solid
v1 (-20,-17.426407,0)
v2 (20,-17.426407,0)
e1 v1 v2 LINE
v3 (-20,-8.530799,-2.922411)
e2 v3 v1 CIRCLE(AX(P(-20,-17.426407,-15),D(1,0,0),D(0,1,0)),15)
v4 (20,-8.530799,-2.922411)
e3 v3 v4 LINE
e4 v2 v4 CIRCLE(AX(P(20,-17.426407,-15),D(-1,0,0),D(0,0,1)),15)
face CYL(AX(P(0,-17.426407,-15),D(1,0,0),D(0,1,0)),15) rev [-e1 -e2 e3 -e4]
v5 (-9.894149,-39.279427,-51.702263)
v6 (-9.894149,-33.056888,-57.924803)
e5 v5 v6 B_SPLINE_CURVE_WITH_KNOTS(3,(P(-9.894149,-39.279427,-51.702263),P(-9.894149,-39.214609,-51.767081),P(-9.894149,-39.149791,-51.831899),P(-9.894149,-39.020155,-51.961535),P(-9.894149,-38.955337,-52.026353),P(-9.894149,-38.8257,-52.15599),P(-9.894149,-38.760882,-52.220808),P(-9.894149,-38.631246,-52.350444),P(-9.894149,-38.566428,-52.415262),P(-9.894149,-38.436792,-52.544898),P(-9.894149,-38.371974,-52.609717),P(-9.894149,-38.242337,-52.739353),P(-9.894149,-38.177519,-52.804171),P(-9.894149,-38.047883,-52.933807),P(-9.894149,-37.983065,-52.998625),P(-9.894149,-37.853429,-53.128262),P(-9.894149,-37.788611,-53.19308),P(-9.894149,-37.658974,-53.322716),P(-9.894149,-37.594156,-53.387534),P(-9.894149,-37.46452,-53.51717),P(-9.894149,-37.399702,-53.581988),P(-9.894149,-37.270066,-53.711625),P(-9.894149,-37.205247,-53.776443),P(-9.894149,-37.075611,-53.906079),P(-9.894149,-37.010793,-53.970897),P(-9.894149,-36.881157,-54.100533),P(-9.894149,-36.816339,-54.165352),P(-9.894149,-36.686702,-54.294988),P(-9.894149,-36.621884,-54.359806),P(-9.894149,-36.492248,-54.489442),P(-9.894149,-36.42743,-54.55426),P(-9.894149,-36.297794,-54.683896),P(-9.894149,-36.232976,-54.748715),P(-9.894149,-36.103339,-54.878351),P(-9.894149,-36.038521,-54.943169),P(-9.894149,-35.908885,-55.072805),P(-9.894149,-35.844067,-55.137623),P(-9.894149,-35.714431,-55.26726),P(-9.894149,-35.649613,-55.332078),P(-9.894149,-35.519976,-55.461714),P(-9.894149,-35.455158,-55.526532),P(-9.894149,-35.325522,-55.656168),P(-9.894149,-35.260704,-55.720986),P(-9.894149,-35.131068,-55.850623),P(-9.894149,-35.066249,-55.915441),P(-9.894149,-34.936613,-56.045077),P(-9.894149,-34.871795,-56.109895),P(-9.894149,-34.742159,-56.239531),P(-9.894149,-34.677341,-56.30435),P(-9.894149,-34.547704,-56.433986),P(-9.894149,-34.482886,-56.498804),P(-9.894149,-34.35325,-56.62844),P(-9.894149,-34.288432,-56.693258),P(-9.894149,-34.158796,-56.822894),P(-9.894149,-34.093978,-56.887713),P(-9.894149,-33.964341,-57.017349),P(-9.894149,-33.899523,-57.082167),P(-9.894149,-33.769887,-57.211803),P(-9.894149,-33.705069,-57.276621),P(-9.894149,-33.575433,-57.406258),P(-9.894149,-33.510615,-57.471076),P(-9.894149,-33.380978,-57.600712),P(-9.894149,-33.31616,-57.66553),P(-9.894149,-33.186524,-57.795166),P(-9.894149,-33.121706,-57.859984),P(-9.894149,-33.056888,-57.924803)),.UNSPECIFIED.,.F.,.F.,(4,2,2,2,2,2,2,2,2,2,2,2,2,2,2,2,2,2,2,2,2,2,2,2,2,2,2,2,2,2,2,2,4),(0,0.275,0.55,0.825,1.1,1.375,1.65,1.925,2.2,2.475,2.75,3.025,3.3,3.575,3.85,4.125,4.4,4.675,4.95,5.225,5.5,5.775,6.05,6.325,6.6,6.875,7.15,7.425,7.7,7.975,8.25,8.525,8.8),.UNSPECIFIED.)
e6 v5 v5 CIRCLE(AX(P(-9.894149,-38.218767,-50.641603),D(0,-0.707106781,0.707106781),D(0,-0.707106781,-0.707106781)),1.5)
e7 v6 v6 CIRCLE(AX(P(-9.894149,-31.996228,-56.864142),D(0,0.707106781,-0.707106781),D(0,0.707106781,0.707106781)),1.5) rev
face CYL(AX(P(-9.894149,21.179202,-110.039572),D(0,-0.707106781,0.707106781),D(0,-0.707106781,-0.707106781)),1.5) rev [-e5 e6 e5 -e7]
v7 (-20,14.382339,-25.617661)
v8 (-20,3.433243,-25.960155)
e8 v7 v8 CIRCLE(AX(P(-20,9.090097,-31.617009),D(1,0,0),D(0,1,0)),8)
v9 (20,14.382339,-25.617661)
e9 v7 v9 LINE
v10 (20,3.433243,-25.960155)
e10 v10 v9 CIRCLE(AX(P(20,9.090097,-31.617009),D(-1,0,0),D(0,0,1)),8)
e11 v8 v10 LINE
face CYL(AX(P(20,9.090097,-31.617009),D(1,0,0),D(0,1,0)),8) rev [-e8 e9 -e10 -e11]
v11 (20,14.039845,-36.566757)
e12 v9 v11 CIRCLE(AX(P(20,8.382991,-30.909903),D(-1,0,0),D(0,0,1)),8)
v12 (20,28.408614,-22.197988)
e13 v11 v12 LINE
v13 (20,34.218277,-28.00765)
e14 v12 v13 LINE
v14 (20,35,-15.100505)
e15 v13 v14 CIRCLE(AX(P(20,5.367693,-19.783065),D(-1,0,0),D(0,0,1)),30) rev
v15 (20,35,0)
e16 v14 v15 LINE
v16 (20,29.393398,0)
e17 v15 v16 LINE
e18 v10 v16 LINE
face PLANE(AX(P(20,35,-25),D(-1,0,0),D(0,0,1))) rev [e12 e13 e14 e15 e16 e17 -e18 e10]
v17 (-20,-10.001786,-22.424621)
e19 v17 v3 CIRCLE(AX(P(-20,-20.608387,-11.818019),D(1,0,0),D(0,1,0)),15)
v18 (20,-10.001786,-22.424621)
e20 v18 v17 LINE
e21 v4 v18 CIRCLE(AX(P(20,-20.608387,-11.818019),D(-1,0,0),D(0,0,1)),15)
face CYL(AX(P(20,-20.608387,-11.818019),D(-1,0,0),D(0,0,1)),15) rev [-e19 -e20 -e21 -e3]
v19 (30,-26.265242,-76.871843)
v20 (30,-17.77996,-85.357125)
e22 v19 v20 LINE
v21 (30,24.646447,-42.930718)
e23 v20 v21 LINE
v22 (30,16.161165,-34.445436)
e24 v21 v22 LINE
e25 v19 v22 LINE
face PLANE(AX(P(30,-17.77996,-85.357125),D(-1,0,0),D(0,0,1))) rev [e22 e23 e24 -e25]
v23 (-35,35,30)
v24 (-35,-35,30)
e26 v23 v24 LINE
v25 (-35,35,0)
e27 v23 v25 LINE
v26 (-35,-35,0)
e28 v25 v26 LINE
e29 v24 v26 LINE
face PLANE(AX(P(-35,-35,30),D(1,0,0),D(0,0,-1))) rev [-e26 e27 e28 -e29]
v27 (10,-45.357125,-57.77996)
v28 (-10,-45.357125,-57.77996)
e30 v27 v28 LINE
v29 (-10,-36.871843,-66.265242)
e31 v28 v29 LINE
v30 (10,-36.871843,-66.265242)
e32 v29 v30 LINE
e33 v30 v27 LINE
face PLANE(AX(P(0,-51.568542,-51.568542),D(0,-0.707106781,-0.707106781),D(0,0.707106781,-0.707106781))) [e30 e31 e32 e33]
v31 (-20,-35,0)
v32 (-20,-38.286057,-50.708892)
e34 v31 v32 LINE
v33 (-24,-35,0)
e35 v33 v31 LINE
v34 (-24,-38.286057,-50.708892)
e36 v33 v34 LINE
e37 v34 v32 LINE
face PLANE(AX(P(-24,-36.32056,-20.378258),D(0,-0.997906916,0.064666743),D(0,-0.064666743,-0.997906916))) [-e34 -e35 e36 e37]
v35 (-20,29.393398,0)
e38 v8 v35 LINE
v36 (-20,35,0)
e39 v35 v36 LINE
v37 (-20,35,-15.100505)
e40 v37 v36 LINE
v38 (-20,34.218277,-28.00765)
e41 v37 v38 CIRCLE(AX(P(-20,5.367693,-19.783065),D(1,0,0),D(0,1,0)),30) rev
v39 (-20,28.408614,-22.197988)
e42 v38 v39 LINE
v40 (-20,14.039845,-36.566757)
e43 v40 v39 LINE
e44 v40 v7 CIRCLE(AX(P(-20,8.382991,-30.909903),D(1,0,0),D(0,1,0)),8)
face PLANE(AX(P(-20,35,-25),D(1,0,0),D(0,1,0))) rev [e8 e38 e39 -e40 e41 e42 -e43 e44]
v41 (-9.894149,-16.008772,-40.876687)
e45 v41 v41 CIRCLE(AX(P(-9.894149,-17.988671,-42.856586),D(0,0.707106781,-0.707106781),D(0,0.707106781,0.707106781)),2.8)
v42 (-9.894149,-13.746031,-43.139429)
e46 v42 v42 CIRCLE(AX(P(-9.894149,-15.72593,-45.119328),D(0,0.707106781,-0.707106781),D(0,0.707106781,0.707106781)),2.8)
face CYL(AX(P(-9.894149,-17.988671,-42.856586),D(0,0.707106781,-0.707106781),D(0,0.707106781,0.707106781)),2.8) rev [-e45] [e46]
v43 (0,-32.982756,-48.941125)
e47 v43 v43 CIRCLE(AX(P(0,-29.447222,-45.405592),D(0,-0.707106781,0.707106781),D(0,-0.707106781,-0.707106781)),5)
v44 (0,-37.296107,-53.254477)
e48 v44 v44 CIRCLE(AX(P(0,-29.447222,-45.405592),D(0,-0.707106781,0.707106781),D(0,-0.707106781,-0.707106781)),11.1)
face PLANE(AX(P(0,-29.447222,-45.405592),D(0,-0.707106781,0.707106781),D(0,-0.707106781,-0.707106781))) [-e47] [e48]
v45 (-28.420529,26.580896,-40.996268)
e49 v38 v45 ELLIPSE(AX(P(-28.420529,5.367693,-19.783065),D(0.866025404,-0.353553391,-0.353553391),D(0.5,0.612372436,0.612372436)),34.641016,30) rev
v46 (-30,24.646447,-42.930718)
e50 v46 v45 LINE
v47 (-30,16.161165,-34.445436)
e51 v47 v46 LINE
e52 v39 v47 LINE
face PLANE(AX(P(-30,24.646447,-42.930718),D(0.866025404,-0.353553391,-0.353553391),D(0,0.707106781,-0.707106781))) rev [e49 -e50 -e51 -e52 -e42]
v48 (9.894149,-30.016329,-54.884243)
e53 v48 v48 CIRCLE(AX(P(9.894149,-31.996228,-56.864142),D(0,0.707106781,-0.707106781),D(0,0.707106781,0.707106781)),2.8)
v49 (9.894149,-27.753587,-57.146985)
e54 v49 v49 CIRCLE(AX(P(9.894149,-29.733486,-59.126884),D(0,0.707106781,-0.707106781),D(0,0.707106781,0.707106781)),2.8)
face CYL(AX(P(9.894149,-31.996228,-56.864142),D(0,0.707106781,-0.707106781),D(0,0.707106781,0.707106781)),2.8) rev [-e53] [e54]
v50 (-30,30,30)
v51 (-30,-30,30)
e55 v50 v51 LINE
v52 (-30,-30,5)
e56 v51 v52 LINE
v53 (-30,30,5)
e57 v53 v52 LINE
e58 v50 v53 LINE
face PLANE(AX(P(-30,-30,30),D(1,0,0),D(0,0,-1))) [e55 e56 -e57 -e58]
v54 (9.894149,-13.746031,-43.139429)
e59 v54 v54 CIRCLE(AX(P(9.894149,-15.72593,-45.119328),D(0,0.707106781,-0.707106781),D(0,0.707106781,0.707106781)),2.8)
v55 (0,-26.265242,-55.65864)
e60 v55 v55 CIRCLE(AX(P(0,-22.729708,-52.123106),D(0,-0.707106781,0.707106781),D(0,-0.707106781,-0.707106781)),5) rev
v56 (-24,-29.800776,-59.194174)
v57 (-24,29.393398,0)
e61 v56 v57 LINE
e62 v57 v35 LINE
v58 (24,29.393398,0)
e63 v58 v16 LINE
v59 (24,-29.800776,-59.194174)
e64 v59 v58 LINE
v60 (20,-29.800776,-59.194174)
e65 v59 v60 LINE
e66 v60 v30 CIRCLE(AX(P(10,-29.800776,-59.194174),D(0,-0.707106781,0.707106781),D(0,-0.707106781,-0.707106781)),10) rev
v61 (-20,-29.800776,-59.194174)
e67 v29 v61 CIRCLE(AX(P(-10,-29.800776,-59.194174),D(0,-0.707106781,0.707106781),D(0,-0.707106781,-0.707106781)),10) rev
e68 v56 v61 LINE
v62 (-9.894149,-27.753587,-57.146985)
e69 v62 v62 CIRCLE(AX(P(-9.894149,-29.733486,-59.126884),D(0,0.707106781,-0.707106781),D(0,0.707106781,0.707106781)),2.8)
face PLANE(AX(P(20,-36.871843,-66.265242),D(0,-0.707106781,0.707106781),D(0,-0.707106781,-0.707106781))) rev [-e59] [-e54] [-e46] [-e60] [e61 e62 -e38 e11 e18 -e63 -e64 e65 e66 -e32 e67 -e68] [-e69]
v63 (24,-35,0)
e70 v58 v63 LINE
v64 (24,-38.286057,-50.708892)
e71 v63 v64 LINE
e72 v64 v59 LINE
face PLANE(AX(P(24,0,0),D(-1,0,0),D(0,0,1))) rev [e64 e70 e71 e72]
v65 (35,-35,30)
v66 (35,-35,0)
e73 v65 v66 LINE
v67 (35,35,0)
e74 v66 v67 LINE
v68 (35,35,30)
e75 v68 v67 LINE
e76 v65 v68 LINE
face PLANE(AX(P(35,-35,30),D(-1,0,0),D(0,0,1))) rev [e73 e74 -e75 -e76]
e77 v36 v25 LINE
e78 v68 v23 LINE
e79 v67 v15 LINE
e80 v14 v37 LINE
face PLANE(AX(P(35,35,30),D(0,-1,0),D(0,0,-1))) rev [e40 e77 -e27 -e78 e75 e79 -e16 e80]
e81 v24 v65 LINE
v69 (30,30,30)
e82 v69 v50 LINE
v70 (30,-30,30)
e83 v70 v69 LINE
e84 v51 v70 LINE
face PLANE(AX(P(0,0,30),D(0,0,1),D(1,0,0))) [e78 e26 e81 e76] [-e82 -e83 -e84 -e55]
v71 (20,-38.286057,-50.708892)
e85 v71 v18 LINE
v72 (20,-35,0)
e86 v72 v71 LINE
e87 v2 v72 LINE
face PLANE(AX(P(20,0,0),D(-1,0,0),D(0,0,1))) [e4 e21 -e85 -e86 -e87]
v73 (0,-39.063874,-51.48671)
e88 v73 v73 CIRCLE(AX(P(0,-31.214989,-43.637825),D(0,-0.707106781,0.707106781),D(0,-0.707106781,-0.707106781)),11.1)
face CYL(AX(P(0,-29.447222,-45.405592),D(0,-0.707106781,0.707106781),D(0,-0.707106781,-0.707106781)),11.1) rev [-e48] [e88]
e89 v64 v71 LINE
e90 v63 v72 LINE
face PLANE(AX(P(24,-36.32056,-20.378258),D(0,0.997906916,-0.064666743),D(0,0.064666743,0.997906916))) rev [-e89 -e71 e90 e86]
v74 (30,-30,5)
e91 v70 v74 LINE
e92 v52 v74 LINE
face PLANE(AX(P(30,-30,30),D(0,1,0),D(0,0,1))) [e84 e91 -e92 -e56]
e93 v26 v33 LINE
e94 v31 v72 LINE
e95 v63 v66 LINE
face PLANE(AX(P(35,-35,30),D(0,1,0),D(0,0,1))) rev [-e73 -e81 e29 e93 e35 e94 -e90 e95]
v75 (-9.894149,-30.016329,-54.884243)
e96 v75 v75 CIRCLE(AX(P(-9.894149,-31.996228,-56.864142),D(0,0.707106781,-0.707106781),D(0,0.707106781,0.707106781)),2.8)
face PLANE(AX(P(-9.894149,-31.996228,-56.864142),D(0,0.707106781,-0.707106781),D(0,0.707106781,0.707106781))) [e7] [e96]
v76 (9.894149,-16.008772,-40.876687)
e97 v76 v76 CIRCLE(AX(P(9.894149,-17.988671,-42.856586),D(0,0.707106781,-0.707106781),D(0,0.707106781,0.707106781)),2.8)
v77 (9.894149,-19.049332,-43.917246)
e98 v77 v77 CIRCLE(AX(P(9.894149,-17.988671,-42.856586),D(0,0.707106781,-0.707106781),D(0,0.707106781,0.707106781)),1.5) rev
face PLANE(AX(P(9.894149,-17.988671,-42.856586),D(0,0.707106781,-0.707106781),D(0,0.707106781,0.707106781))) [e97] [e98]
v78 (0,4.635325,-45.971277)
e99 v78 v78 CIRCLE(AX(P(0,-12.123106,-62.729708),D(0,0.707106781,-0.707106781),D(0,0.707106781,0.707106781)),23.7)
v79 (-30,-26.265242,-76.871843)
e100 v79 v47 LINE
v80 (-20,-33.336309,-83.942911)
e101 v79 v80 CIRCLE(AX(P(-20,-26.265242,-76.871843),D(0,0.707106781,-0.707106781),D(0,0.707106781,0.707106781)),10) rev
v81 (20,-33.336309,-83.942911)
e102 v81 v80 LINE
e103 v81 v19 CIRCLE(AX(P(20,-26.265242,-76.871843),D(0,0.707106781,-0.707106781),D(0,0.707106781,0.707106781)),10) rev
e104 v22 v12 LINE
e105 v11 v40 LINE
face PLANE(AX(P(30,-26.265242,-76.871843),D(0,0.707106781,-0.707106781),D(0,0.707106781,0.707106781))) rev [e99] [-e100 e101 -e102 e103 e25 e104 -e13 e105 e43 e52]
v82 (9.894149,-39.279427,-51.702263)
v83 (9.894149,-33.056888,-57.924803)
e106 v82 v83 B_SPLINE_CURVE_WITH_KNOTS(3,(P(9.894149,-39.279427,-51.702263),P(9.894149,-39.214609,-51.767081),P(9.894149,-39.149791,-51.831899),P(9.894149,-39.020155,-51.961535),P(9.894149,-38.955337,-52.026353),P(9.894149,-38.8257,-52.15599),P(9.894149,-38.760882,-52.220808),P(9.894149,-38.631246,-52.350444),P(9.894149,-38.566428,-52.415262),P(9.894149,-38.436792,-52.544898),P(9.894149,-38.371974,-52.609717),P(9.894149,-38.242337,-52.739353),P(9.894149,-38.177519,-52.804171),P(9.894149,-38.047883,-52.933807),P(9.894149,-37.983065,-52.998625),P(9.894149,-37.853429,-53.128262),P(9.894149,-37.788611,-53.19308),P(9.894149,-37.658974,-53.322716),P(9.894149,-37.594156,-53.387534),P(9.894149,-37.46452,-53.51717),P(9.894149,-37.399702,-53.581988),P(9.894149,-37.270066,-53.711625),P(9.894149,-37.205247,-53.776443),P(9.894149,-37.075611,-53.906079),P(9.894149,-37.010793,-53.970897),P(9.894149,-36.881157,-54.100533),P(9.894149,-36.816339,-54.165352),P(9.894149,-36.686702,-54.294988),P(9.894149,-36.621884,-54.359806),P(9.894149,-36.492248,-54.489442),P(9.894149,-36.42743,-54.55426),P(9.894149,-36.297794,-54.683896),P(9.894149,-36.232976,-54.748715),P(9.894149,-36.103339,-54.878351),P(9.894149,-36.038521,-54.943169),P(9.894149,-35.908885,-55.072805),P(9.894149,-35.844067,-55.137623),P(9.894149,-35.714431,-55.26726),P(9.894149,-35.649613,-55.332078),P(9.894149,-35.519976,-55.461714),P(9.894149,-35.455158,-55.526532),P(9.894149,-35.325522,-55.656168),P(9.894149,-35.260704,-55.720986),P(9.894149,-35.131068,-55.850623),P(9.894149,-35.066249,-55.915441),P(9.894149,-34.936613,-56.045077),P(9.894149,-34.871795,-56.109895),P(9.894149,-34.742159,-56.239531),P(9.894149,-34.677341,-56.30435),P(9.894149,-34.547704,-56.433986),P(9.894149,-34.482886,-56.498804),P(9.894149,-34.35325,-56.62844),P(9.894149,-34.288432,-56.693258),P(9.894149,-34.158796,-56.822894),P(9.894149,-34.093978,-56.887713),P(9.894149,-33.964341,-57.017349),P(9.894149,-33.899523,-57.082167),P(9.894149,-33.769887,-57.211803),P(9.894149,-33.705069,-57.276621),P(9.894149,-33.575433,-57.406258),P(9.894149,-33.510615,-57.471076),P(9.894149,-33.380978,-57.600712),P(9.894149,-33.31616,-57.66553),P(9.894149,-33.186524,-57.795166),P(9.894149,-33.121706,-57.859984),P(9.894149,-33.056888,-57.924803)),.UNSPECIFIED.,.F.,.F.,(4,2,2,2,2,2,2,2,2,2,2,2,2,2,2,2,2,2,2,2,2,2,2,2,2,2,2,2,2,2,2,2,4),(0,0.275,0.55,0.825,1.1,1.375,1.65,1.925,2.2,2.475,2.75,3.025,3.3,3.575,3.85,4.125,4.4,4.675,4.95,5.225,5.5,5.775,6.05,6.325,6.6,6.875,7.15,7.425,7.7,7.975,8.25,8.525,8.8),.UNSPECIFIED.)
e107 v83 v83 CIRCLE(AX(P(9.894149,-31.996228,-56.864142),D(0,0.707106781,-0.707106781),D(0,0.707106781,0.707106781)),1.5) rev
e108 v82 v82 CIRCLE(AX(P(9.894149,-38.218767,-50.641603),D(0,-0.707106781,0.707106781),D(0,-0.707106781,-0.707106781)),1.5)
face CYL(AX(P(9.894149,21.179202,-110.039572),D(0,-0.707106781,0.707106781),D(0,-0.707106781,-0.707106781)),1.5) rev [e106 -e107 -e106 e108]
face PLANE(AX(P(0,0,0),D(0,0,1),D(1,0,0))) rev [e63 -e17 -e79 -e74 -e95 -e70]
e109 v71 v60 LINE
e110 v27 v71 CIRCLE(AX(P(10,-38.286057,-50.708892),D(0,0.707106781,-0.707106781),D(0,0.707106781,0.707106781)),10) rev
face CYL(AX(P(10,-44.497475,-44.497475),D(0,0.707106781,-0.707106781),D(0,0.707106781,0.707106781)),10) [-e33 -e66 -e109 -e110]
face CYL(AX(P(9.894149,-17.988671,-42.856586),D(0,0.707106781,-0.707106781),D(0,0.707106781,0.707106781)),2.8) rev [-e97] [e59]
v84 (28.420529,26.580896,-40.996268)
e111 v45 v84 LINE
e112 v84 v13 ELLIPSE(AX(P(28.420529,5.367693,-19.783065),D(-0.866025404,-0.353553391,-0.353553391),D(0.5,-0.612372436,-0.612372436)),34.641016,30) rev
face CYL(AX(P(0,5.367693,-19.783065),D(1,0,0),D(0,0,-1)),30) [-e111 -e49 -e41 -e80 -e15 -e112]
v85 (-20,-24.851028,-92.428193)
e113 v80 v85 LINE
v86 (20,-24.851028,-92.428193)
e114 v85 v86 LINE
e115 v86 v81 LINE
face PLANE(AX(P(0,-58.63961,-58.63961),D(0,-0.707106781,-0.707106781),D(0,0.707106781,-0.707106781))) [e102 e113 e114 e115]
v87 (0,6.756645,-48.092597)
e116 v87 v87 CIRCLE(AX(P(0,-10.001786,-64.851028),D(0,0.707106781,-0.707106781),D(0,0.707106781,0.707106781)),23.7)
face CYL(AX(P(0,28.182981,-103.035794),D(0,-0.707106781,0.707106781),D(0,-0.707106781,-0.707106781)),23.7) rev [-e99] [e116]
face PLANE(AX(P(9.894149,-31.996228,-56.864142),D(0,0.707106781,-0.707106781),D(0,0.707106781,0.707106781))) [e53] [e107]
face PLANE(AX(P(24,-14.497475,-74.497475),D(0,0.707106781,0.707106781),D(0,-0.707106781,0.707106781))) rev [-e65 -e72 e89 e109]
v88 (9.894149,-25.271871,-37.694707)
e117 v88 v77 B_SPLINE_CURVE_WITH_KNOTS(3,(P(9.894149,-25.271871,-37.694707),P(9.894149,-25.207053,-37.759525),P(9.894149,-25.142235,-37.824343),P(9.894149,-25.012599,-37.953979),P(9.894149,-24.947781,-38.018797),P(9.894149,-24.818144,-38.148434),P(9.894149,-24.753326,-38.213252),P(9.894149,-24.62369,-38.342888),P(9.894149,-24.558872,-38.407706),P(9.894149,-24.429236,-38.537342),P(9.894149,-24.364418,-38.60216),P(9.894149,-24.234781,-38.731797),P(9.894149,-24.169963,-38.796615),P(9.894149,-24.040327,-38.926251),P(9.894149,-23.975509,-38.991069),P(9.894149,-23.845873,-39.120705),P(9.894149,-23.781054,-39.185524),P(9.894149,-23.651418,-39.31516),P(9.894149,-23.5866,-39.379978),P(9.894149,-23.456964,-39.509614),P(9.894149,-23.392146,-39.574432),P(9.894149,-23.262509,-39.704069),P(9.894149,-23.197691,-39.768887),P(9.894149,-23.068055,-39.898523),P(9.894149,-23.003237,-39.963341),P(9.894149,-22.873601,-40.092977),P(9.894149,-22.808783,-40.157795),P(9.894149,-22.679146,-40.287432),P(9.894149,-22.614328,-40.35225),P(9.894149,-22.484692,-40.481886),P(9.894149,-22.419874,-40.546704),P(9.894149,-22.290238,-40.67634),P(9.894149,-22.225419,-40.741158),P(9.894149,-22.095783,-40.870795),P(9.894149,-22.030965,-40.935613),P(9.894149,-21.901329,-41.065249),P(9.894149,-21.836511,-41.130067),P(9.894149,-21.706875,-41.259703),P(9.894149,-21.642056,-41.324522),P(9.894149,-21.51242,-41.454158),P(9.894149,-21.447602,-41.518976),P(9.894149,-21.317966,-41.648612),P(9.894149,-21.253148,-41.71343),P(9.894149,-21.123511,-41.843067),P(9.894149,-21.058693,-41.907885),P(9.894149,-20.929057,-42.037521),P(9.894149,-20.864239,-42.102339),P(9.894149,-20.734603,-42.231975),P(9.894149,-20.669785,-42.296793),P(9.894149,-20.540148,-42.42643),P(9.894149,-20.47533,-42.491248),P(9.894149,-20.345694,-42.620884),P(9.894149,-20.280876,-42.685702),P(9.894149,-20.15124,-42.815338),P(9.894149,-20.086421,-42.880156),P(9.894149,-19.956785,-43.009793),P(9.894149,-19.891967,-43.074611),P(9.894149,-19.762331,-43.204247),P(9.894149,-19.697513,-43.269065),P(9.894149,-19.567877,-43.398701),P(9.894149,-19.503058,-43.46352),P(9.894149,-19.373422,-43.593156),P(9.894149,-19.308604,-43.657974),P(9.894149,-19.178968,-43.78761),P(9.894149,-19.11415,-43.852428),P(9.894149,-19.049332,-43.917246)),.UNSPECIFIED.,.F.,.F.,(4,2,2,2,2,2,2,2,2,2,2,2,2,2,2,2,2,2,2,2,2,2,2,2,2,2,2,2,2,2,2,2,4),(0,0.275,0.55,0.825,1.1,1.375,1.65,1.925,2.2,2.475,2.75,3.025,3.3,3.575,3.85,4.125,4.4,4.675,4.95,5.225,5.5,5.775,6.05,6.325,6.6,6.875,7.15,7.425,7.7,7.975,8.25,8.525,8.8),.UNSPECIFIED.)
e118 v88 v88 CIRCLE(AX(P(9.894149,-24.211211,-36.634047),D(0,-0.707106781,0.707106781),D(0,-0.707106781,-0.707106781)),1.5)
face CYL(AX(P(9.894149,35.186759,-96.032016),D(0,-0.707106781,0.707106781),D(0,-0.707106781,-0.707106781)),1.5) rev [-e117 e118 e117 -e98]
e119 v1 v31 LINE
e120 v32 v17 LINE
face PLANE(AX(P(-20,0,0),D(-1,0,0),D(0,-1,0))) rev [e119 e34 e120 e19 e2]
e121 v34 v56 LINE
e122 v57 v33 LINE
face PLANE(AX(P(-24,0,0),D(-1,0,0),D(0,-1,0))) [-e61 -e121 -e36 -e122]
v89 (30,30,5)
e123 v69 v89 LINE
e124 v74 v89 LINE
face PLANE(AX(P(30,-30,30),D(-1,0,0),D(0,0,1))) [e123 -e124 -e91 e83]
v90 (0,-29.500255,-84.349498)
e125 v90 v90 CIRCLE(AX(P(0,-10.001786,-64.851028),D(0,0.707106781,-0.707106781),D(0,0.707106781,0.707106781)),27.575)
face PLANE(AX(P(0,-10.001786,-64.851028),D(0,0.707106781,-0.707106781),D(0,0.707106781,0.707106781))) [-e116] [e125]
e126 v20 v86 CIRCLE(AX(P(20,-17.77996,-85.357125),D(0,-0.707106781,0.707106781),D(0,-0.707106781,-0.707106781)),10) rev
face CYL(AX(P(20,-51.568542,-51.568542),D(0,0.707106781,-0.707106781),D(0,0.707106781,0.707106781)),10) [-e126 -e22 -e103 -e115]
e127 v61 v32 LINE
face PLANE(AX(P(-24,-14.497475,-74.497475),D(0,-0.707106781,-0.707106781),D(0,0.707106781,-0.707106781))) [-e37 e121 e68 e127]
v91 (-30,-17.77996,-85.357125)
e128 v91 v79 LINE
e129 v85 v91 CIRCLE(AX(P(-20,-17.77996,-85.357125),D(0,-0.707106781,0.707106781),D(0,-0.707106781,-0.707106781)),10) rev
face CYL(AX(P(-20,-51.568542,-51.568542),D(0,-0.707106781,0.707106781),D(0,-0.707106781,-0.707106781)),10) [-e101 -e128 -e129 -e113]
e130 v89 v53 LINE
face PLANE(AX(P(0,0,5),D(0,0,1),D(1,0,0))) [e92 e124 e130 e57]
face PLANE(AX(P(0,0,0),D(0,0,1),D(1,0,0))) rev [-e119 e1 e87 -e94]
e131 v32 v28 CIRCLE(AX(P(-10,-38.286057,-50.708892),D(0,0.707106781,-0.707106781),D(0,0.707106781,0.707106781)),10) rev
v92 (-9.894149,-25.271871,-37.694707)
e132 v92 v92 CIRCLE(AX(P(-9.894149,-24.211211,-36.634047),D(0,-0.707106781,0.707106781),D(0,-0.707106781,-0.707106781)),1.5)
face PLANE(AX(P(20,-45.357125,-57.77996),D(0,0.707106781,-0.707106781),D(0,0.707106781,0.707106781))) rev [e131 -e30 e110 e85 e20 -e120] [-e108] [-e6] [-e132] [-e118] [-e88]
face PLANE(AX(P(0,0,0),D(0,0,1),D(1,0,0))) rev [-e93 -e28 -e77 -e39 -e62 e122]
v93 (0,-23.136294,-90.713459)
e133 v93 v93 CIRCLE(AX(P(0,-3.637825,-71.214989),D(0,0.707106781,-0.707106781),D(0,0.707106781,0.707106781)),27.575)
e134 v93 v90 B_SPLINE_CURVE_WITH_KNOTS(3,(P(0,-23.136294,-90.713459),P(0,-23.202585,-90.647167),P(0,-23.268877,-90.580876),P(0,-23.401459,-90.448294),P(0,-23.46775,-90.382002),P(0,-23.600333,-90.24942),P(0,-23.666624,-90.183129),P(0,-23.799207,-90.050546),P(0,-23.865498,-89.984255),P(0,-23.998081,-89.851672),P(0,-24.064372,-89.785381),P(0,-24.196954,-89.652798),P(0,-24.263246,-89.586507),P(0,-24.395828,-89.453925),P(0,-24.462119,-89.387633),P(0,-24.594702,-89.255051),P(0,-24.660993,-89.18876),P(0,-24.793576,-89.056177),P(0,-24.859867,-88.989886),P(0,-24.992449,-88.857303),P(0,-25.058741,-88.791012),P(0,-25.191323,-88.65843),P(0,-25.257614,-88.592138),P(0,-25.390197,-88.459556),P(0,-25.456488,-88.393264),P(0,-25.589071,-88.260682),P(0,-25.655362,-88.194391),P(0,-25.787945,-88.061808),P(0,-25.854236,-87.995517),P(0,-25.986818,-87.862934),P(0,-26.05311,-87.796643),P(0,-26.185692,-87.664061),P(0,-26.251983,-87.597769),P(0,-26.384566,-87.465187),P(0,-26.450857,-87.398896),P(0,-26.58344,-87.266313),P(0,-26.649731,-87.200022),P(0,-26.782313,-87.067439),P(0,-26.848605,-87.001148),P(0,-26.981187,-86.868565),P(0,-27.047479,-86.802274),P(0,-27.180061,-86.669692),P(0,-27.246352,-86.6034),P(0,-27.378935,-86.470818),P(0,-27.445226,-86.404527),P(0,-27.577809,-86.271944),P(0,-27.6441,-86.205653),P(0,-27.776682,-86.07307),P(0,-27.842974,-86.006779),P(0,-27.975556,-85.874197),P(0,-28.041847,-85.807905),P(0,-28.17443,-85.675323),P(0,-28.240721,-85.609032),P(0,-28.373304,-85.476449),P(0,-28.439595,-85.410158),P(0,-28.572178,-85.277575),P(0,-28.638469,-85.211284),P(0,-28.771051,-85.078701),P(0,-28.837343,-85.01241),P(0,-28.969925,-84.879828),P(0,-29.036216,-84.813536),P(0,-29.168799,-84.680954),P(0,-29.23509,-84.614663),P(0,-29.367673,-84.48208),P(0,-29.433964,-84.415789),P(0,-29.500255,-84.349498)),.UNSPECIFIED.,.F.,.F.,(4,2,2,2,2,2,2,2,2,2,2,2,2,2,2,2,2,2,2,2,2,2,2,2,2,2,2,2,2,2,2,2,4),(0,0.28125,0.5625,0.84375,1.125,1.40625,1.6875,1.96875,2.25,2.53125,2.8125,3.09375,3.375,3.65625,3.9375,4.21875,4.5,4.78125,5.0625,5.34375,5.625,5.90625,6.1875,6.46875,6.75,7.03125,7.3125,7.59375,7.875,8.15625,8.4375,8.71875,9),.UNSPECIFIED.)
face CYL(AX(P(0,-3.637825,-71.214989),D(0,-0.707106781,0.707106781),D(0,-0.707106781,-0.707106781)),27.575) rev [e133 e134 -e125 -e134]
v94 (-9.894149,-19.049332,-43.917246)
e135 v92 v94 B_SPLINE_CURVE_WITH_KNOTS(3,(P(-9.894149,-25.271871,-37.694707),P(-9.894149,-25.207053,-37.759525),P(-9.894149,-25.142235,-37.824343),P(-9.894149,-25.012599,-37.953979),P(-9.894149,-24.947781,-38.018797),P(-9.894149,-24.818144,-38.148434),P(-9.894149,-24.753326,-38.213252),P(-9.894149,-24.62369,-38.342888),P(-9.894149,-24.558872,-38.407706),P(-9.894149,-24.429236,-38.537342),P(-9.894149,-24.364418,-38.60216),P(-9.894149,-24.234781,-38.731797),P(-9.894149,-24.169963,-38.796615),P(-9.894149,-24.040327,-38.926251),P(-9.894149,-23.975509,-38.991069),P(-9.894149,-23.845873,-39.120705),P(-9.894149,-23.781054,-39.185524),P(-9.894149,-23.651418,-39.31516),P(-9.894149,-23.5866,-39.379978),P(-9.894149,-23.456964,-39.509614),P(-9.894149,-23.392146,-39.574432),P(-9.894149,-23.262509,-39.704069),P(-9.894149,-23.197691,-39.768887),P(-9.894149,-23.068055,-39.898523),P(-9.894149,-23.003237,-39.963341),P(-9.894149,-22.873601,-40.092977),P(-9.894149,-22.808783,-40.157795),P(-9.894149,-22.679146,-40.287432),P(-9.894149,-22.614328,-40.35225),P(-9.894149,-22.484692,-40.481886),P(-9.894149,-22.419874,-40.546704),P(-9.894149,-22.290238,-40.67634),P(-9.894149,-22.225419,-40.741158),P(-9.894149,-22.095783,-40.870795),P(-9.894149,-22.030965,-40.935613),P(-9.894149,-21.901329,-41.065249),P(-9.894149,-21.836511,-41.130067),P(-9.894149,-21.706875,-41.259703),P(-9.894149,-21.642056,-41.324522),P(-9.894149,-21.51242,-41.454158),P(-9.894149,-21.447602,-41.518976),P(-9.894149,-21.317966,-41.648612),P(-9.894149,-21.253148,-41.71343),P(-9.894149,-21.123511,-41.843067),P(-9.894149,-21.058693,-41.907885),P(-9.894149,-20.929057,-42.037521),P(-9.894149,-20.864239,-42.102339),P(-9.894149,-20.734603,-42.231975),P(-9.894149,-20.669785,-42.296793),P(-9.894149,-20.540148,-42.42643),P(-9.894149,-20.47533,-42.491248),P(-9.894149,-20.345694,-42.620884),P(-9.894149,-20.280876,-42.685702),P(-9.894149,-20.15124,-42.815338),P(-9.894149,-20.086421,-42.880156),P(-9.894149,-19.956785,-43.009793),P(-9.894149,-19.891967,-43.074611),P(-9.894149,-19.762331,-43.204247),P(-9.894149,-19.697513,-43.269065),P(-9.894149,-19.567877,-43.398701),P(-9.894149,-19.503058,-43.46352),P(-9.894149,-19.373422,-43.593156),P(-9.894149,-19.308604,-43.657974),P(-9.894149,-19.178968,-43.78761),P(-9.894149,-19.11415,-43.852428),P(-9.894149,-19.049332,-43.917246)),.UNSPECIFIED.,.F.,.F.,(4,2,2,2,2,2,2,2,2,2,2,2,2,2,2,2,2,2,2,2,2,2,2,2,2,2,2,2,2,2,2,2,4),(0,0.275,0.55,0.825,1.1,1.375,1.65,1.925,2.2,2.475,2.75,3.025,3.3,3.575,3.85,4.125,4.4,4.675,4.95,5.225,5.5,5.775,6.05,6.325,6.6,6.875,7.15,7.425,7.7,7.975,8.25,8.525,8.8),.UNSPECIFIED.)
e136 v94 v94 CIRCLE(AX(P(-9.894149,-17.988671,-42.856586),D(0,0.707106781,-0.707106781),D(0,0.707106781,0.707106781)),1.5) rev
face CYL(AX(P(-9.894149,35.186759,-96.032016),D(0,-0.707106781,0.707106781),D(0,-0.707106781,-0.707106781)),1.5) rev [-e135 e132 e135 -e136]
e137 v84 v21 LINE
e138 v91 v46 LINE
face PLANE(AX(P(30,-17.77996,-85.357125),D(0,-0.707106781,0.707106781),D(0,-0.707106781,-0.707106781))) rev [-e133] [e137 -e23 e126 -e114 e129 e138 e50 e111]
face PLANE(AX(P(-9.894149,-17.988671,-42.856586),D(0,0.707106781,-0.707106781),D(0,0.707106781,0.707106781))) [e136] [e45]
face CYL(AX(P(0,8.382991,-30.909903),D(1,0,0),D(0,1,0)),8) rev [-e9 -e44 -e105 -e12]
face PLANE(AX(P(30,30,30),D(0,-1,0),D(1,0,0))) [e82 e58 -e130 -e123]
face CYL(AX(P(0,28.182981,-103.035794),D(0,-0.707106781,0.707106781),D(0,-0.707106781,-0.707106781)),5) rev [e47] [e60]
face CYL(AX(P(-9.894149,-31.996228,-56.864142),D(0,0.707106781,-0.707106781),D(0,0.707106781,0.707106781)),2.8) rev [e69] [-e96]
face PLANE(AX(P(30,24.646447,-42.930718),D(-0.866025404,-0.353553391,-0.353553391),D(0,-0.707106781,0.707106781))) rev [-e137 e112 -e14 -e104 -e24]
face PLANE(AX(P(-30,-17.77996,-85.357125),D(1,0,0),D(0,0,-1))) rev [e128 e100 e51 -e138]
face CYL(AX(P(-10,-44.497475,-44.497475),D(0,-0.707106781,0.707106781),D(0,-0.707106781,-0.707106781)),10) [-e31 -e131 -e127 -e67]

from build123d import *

# Parameters (mm, degrees)
SCHIZZO1_W                   = 70
SCHIZZO1_H                   = 70
SCHIZZO1_W_2                 = 60
SCHIZZO1_H_2                 = 60
ESTRUSIONE_ESTRUSIONE1_DEPTH = 30
SCHIZZO2_W                   = 70
SCHIZZO2_H                   = 70
ESTRUSIONE_ESTRUSIONE2_DEPTH = 5
SCHIZZO3_W                   = 40
SCHIZZO3_H                   = 20
ESTRUSIONE_ESTRUSIONE3_DEPTH = 25
SMUSSO1_SIZE                 = 20
SCHIZZO4_W                   = 60
SCHIZZO4_H                   = 12
SCHIZZO4_W_2                 = 40
ESTRUSIONE_ESTRUSIONE4_DEPTH = 80
SCHIZZO19_W                  = 60
SCHIZZO19_H                  = 12
ESTRUSIONE_ESTRUSIONE7_DEPTH = 10
TAGLIO_ESTRUSIONE1_START     = 3
SCHIZZO6_R                   = 27.575
TAGLIO_ESTRUSIONE1_DEPTH     = 9
TAGLIO_ESTRUSIONE2_REACH     = 105.555
SCHIZZO7_R                   = 23.7
SCHIZZO9_R                   = 11.1
TAGLIO_ESTRUSIONE3_DEPTH     = 2.5
TAGLIO_ESTRUSIONE4_REACH     = 108.384
SCHIZZO10_R                  = 1.5
SCHIZZO11_R                  = 2.8
TAGLIO_ESTRUSIONE5_DEPTH     = 3.2
TAGLIO_ESTRUSIONE6_REACH     = 107.837
SCHIZZO12_R                  = 5
SCHIZZO13_W                  = 40
SCHIZZO13_H                  = 54
ESTRUSIONE_ESTRUSIONE5_DEPTH = 7
SCHIZZO17_W                  = 40
SCHIZZO17_H                  = 45
ESTRUSIONE_ESTRUSIONE6_DEPTH = 15
RACCORDO4_R                  = 10
SCHIZZO18_W                  = 60
SCHIZZO18_H                  = 60
TAGLIO_ESTRUSIONE10_DEPTH    = 114.024428621
SMUSSO2_SIZE                 = 20
SMUSSO2_SIZE_2               = 11.547005384
RACCORDO5_R                  = 30
RACCORDO6_R                  = 8
RACCORDO7_R                  = 15
ESTRUSIONE_ESTRUSIONE8_START = 20
ESTRUSIONE_ESTRUSIONE8_DEPTH = 4
ESTRUSIONE_ESTRUSIONE9_START = -20
ESTRUSIONE_ESTRUSIONE9_DEPTH = 4


# Some blends are built 0.0001 mm under size
with BuildPart() as part:
    # Schizzo1 → Estrusione-Estrusione1 (new body)
    with BuildSketch(Plane.XY):
        Rectangle(SCHIZZO1_W, SCHIZZO1_H)
        Rectangle(SCHIZZO1_W_2, SCHIZZO1_H_2, mode=Mode.SUBTRACT)
    extrude(amount=ESTRUSIONE_ESTRUSIONE1_DEPTH)

    # Schizzo2 → Estrusione-Estrusione2 (add)
    with BuildSketch(Plane.XY):
        Rectangle(SCHIZZO2_W, SCHIZZO2_H)
    extrude(amount=ESTRUSIONE_ESTRUSIONE2_DEPTH)

    # Schizzo3 → Estrusione-Estrusione3 (add)
    with BuildSketch(Plane(origin=(0, 0, 0), x_dir=(-1, 0, 0), z_dir=(0, 0, -1))):
        with Locations((0, 25)):
            Rectangle(SCHIZZO3_W, SCHIZZO3_H)
    extrude(amount=ESTRUSIONE_ESTRUSIONE3_DEPTH)

    # Smusso1
    smusso1_edges = [part.edges().sort_by_distance(p)[0] for p in [
        (0, 15, -25),
    ]]
    chamfer(smusso1_edges, length=SMUSSO1_SIZE - 0.0001)  # a hair under: the kernel refuses the full size

    # Schizzo4 → Estrusione-Estrusione4 (add)
    with BuildSketch(Plane(origin=(0, 5, 5), x_dir=(-1, 0, 0), z_dir=(0, -0.7071067811865487, -0.7071067811865464))):
        with Locations((0, 41.784271247)):
            Rectangle(SCHIZZO4_W, SCHIZZO4_H)
        with Locations((0, 14.784271247)):
            Rectangle(SCHIZZO4_W_2, SCHIZZO4_H)
    extrude(amount=ESTRUSIONE_ESTRUSIONE4_DEPTH)

    # Schizzo19 → Estrusione-Estrusione7 (add)
    with BuildSketch(Plane(origin=(0, -51.568542495, -51.568542495), x_dir=(1, 0, 0), z_dir=(0, -0.7071067811865488, -0.7071067811865464))):
        with Locations((0, -41.784271247)):
            Rectangle(SCHIZZO19_W, SCHIZZO19_H)
    extrude(amount=ESTRUSIONE_ESTRUSIONE7_DEPTH)

    # Schizzo6 → Taglio-Estrusione1 (cut)
    with BuildSketch(Plane(origin=(0, 25.303300859, -25.303300859), x_dir=(1, 0, 0), z_dir=(0, 0.7071067811865465, -0.7071067811865486)).offset(TAGLIO_ESTRUSIONE1_START)):
        with Locations(Location((0, 52.928932188, 0), (0, 0, 90))):
            Circle(SCHIZZO6_R)
    extrude(amount=TAGLIO_ESTRUSIONE1_DEPTH, mode=Mode.SUBTRACT)

    # Schizzo7 → Taglio-Estrusione2 (cut, up to next)
    with BuildSketch(Plane(origin=(0, 25.303300859, -25.303300859), x_dir=(1, 0, 0), z_dir=(0, 0.7071067811865464, -0.7071067811865487)), mode=Mode.PRIVATE) as taglio_estrusione2_sk1:
        with Locations(Location((0, 52.928932188, 0), (0, 0, 270))):
            Circle(SCHIZZO7_R)
    taglio_estrusione2_tool1 = extrude(taglio_estrusione2_sk1.sketch, amount=TAGLIO_ESTRUSIONE2_REACH, mode=Mode.PRIVATE) & part.part
    add(taglio_estrusione2_tool1.solids().sort_by_distance((0, -12.123106, -62.729708))[0], mode=Mode.SUBTRACT)

    # Schizzo9 → Taglio-Estrusione3 (cut)
    with BuildSketch(Plane(origin=(0, 6.211417767, -6.211417767), x_dir=(1, 0, 0), z_dir=(0, -0.7071067811865464, 0.7071067811865487))):
        with Locations(Location((0, -52.928932188, 0), (0, 0, 270))):
            Circle(SCHIZZO9_R)
    extrude(amount=-TAGLIO_ESTRUSIONE3_DEPTH, mode=Mode.SUBTRACT)

    # Schizzo10 → Taglio-Estrusione4 (cut, up to next)
    with BuildSketch(Plane(origin=(0, 6.211417767, -6.211417767), x_dir=(1, 0, 0), z_dir=(0, -0.7071067811865464, 0.7071067811865487)), mode=Mode.PRIVATE) as taglio_estrusione4_sk1:
        with Locations(Location((-9.89414905, -43.02409425, 0), (0, 0, 270))):
            Circle(SCHIZZO10_R)
    taglio_estrusione4_tool1 = extrude(taglio_estrusione4_sk1.sketch, amount=-TAGLIO_ESTRUSIONE4_REACH, mode=Mode.PRIVATE) & part.part
    # Schizzo10 → Taglio-Estrusione4 (cut, up to next)
    with BuildSketch(Plane(origin=(0, 6.211417767, -6.211417767), x_dir=(1, 0, 0), z_dir=(0, -0.7071067811865464, 0.7071067811865487)), mode=Mode.PRIVATE) as taglio_estrusione4_sk2:
        with Locations(Location((9.89414905, -43.02409425, 0), (0, 0, 270))):
            Circle(SCHIZZO10_R)
    taglio_estrusione4_tool2 = extrude(taglio_estrusione4_sk2.sketch, amount=-TAGLIO_ESTRUSIONE4_REACH, mode=Mode.PRIVATE) & part.part
    # Schizzo10 → Taglio-Estrusione4 (cut, up to next)
    with BuildSketch(Plane(origin=(0, 6.211417767, -6.211417767), x_dir=(1, 0, 0), z_dir=(0, -0.7071067811865464, 0.7071067811865487)), mode=Mode.PRIVATE) as taglio_estrusione4_sk3:
        with Locations(Location((9.89414905, -62.833770126, 0), (0, 0, 270))):
            Circle(SCHIZZO10_R)
    taglio_estrusione4_tool3 = extrude(taglio_estrusione4_sk3.sketch, amount=-TAGLIO_ESTRUSIONE4_REACH, mode=Mode.PRIVATE) & part.part
    # Schizzo10 → Taglio-Estrusione4 (cut, up to next)
    with BuildSketch(Plane(origin=(0, 6.211417767, -6.211417767), x_dir=(1, 0, 0), z_dir=(0, -0.7071067811865464, 0.7071067811865487)), mode=Mode.PRIVATE) as taglio_estrusione4_sk4:
        with Locations(Location((-9.89414905, -62.833770126, 0), (0, 0, 270))):
            Circle(SCHIZZO10_R)
    taglio_estrusione4_tool4 = extrude(taglio_estrusione4_sk4.sketch, amount=-TAGLIO_ESTRUSIONE4_REACH, mode=Mode.PRIVATE) & part.part
    add(taglio_estrusione4_tool1.solids().sort_by_distance((-9.894149, -24.211211, -36.634047))[0], mode=Mode.SUBTRACT)
    add(taglio_estrusione4_tool2.solids().sort_by_distance((9.894149, -24.211211, -36.634047))[0], mode=Mode.SUBTRACT)
    add(taglio_estrusione4_tool3.solids().sort_by_distance((9.894149, -38.218767, -50.641603))[0], mode=Mode.SUBTRACT)
    add(taglio_estrusione4_tool4.solids().sort_by_distance((-9.894149, -38.218767, -50.641603))[0], mode=Mode.SUBTRACT)

    # Schizzo11 → Taglio-Estrusione5 (cut)
    with BuildSketch(Plane(origin=(0, 14.696699141, -14.696699141), x_dir=(1, 0, 0), z_dir=(0, 0.7071067811865464, -0.7071067811865487))):
        with Locations(Location((-9.89414905, 62.833770126, 0), (0, 0, 270))):
            Circle(SCHIZZO11_R)
        with Locations(Location((-9.89414905, 43.02409425, 0), (0, 0, 270))):
            Circle(SCHIZZO11_R)
        with Locations(Location((9.89414905, 62.833770126, 0), (0, 0, 270))):
            Circle(SCHIZZO11_R)
        with Locations(Location((9.89414905, 43.02409425, 0), (0, 0, 270))):
            Circle(SCHIZZO11_R)
    extrude(amount=-TAGLIO_ESTRUSIONE5_DEPTH, mode=Mode.SUBTRACT)

    # Schizzo12 → Taglio-Estrusione6 (cut, up to next)
    with BuildSketch(Plane(origin=(0, 7.97918472, -7.97918472), x_dir=(1, 0, 0), z_dir=(0, -0.7071067811865464, 0.7071067811865487)), mode=Mode.PRIVATE) as taglio_estrusione6_sk1:
        with Locations(Location((0, -52.928932188, 0), (0, 0, 270))):
            Circle(SCHIZZO12_R)
    taglio_estrusione6_tool1 = extrude(taglio_estrusione6_sk1.sketch, amount=-TAGLIO_ESTRUSIONE6_REACH, mode=Mode.PRIVATE) & part.part
    add(taglio_estrusione6_tool1.solids().sort_by_distance((0, -29.447222, -45.405592))[0], mode=Mode.SUBTRACT)

    # Schizzo13 → Estrusione-Estrusione5 (add)
    with BuildSketch(Plane(origin=(0, 5, 5), x_dir=(1, 0, 0), z_dir=(0, 0.7071067811865488, 0.7071067811865464))):
        with Locations((0, 20.784271247)):
            Rectangle(SCHIZZO13_W, SCHIZZO13_H)
    extrude(amount=ESTRUSIONE_ESTRUSIONE5_DEPTH)

    # Schizzo17 → Estrusione-Estrusione6 (add)
    with BuildSketch(Plane(origin=(0, 5, 5), x_dir=(1, 0, 0), z_dir=(0, -0.7071067811865487, -0.7071067811865465))):
        with Locations((0, -13.284271247)):
            Rectangle(SCHIZZO17_W, SCHIZZO17_H)
    extrude(amount=ESTRUSIONE_ESTRUSIONE6_DEPTH)

    # Raccordo4
    raccordo4_edges = [part.edges().sort_by_distance(p)[0] for p in [
        (20, -41.114484041, -62.022600949),
        (-20, -41.114484041, -62.022600949),
        (-30, -29.093668761, -88.185551853),
        (30, -29.093668761, -88.185551853),
    ]]
    fillet(raccordo4_edges, radius=RACCORDO4_R)

    # Schizzo18 → Taglio-Estrusione10 (cut, through all)
    with BuildSketch(Plane.XY.offset(5)):
        Rectangle(SCHIZZO18_W, SCHIZZO18_H)
    extrude(amount=TAGLIO_ESTRUSIONE10_DEPTH, mode=Mode.SUBTRACT)

    # Smusso2
    # the kernel refuses this chamfer: 20, 11.547005384 mm, written as the material it takes off along each edge
    with BuildSketch(Plane(origin=(-30, 75.375499846, -65.375499846), x_dir=(-0.019326765612700806, -0.7069747082219261, -0.7069747082219237), z_dir=(0, -0.7071067811865464, 0.7071067811865487))) as smusso2_piece_1_section:
        Polygon((SMUSSO2_SIZE * 0.999813220622, SMUSSO2_SIZE * 0.0193267656127), (-SMUSSO2_SIZE_2 * 0.0193267656124, SMUSSO2_SIZE_2 * 0.999813220604), (0, 0), align=None)
    smusso2_piece_1 = extrude(amount=63.741715093, mode=Mode.PRIVATE)
    smusso2_piece_1 = split(smusso2_piece_1, bisect_by=Plane(origin=(-20, 29.75727976, -29.334603333), z_dir=(-1, 0, 0)), keep=Keep.TOP, mode=Mode.PRIVATE)
    add(smusso2_piece_1, mode=Mode.SUBTRACT)
    with BuildSketch(Plane(origin=(30, 30.303300859, -20.303300859), x_dir=(-0.9983227437537926, 0.04093714269400887, 0.04093714269400999), z_dir=(0, 0.7071067811865464, -0.7071067811865487))) as smusso2_piece_2_section:
        Polygon((SMUSSO2_SIZE_2 * 0.998322743736, -SMUSSO2_SIZE_2 * 0.0578938624016), (-SMUSSO2_SIZE * 0.0578938624027, -SMUSSO2_SIZE * 0.998322743754), (0, 0), align=None)
    smusso2_piece_2 = extrude(amount=63.741715093, mode=Mode.PRIVATE)
    smusso2_piece_2 = split(smusso2_piece_2, bisect_by=Plane(origin=(20, 29.75727976, -29.334603333), z_dir=(1, 0, 0)), keep=Keep.TOP, mode=Mode.PRIVATE)
    add(smusso2_piece_2, mode=Mode.SUBTRACT)

    # Raccordo5
    # the kernel refuses this fillet: 30 mm, written as the material it takes off along each edge
    with BuildSketch(Plane(origin=(-80.660687982, 43.738329701, -23.838834765), x_dir=(0, -0.707106781186546, 0.7071067811865489), z_dir=(1, 0, 0))) as raccordo5_piece_1:
        with BuildLine():
            CenterArc((30, 24.264275193), RACCORDO5_R, 180, 53.979747048)
            Line((0, 24.264275193), (-0.6, 24.264275193))
            Line((-0.6, 24.264275193), (-0.6, 0))
            Line((-0.6, 0), (0, -0.6))
            ThreePointArc((0, -0.6), (6.178932188, -0.6), (12.005021664, -0.485285504))
            Line((12.005021664, -0.485285504), (12.357864376, 0))
        make_face()
    extrude(amount=161.321375964, mode=Mode.SUBTRACT)

    # Raccordo6
    # the kernel refuses this fillet: 8 mm, written as the material it adds along each edge
    with BuildSketch(Plane(origin=(-20, 9.090097423, -20.303300859), x_dir=(0, 0.7071067811865467, -0.7071067811865487), z_dir=(1, 0, 0))) as raccordo6_piece_1:
        with BuildLine():
            CenterArc((RACCORDO6_R, -RACCORDO6_R), RACCORDO6_R, 90, 90)
            Line((0, -RACCORDO6_R), (0, 0))
            Line((0, 0), (RACCORDO6_R, 0))
        make_face()
    extrude(amount=40)
    with BuildSketch(Plane(origin=(20, 19.696699141, -30.909902577), x_dir=(0, -0.7071067811865491, -0.707106781186546), z_dir=(-1, 0, 0))) as raccordo6_piece_2:
        with BuildLine():
            CenterArc((RACCORDO6_R, RACCORDO6_R), RACCORDO6_R, 180, 90)
            Line((0, RACCORDO6_R), (0, 0))
            Line((0, 0), (RACCORDO6_R, 0))
        make_face()
    extrude(amount=40)

    # Raccordo7
    # the kernel refuses this fillet: 15 mm, written as the material it adds along each edge
    with BuildSketch(Plane(origin=(-20, -11.213203436, 0), x_dir=(0, -1, 0), z_dir=(1, 0, 0))) as raccordo7_piece_1:
        with BuildLine():
            CenterArc((RACCORDO7_R * 0.414213562373, RACCORDO7_R), RACCORDO7_R, 225, 45)
            Line((-RACCORDO7_R * 0.292893218813, RACCORDO7_R * 0.292893218813), (0, 0))
            Line((0, 0), (RACCORDO7_R * 0.414213562373, 0))
        make_face()
    extrude(amount=40)
    with BuildSketch(Plane(origin=(20, 0.604816049, -11.818019485), x_dir=(0, -0.7071067811865464, 0.7071067811865487), z_dir=(-1, 0, 0))) as raccordo7_piece_2:
        with BuildLine():
            CenterArc((RACCORDO7_R, -RACCORDO7_R), RACCORDO7_R, 90, 90)
            Line((0, -RACCORDO7_R), (0, 0))
            Line((0, 0), (RACCORDO7_R, 0))
        make_face()
    extrude(amount=40)

    # Schizzo20 → Estrusione-Estrusione8 (add)
    with BuildSketch(Plane(origin=(0, 0, 0), x_dir=(0, 0, -1), z_dir=(1, 0, 0)).offset(ESTRUSIONE_ESTRUSIONE8_START)):
        Polygon((0, -35), (50.70889245, -38.286056916), (59.194173824, -29.800775542), (0, 29.393398282), align=None)
    extrude(amount=ESTRUSIONE_ESTRUSIONE8_DEPTH)

    # Schizzo21 → Estrusione-Estrusione9 (add)
    with BuildSketch(Plane(origin=(0, 0, 0), x_dir=(0, 0, -1), z_dir=(1, 0, 0)).offset(ESTRUSIONE_ESTRUSIONE9_START)):
        Polygon((50.70889245, -38.286056916), (0, -35), (0, 29.393398282), (59.194173824, -29.800775542), align=None)
    extrude(amount=-ESTRUSIONE_ESTRUSIONE9_DEPTH)


solid = part.part
